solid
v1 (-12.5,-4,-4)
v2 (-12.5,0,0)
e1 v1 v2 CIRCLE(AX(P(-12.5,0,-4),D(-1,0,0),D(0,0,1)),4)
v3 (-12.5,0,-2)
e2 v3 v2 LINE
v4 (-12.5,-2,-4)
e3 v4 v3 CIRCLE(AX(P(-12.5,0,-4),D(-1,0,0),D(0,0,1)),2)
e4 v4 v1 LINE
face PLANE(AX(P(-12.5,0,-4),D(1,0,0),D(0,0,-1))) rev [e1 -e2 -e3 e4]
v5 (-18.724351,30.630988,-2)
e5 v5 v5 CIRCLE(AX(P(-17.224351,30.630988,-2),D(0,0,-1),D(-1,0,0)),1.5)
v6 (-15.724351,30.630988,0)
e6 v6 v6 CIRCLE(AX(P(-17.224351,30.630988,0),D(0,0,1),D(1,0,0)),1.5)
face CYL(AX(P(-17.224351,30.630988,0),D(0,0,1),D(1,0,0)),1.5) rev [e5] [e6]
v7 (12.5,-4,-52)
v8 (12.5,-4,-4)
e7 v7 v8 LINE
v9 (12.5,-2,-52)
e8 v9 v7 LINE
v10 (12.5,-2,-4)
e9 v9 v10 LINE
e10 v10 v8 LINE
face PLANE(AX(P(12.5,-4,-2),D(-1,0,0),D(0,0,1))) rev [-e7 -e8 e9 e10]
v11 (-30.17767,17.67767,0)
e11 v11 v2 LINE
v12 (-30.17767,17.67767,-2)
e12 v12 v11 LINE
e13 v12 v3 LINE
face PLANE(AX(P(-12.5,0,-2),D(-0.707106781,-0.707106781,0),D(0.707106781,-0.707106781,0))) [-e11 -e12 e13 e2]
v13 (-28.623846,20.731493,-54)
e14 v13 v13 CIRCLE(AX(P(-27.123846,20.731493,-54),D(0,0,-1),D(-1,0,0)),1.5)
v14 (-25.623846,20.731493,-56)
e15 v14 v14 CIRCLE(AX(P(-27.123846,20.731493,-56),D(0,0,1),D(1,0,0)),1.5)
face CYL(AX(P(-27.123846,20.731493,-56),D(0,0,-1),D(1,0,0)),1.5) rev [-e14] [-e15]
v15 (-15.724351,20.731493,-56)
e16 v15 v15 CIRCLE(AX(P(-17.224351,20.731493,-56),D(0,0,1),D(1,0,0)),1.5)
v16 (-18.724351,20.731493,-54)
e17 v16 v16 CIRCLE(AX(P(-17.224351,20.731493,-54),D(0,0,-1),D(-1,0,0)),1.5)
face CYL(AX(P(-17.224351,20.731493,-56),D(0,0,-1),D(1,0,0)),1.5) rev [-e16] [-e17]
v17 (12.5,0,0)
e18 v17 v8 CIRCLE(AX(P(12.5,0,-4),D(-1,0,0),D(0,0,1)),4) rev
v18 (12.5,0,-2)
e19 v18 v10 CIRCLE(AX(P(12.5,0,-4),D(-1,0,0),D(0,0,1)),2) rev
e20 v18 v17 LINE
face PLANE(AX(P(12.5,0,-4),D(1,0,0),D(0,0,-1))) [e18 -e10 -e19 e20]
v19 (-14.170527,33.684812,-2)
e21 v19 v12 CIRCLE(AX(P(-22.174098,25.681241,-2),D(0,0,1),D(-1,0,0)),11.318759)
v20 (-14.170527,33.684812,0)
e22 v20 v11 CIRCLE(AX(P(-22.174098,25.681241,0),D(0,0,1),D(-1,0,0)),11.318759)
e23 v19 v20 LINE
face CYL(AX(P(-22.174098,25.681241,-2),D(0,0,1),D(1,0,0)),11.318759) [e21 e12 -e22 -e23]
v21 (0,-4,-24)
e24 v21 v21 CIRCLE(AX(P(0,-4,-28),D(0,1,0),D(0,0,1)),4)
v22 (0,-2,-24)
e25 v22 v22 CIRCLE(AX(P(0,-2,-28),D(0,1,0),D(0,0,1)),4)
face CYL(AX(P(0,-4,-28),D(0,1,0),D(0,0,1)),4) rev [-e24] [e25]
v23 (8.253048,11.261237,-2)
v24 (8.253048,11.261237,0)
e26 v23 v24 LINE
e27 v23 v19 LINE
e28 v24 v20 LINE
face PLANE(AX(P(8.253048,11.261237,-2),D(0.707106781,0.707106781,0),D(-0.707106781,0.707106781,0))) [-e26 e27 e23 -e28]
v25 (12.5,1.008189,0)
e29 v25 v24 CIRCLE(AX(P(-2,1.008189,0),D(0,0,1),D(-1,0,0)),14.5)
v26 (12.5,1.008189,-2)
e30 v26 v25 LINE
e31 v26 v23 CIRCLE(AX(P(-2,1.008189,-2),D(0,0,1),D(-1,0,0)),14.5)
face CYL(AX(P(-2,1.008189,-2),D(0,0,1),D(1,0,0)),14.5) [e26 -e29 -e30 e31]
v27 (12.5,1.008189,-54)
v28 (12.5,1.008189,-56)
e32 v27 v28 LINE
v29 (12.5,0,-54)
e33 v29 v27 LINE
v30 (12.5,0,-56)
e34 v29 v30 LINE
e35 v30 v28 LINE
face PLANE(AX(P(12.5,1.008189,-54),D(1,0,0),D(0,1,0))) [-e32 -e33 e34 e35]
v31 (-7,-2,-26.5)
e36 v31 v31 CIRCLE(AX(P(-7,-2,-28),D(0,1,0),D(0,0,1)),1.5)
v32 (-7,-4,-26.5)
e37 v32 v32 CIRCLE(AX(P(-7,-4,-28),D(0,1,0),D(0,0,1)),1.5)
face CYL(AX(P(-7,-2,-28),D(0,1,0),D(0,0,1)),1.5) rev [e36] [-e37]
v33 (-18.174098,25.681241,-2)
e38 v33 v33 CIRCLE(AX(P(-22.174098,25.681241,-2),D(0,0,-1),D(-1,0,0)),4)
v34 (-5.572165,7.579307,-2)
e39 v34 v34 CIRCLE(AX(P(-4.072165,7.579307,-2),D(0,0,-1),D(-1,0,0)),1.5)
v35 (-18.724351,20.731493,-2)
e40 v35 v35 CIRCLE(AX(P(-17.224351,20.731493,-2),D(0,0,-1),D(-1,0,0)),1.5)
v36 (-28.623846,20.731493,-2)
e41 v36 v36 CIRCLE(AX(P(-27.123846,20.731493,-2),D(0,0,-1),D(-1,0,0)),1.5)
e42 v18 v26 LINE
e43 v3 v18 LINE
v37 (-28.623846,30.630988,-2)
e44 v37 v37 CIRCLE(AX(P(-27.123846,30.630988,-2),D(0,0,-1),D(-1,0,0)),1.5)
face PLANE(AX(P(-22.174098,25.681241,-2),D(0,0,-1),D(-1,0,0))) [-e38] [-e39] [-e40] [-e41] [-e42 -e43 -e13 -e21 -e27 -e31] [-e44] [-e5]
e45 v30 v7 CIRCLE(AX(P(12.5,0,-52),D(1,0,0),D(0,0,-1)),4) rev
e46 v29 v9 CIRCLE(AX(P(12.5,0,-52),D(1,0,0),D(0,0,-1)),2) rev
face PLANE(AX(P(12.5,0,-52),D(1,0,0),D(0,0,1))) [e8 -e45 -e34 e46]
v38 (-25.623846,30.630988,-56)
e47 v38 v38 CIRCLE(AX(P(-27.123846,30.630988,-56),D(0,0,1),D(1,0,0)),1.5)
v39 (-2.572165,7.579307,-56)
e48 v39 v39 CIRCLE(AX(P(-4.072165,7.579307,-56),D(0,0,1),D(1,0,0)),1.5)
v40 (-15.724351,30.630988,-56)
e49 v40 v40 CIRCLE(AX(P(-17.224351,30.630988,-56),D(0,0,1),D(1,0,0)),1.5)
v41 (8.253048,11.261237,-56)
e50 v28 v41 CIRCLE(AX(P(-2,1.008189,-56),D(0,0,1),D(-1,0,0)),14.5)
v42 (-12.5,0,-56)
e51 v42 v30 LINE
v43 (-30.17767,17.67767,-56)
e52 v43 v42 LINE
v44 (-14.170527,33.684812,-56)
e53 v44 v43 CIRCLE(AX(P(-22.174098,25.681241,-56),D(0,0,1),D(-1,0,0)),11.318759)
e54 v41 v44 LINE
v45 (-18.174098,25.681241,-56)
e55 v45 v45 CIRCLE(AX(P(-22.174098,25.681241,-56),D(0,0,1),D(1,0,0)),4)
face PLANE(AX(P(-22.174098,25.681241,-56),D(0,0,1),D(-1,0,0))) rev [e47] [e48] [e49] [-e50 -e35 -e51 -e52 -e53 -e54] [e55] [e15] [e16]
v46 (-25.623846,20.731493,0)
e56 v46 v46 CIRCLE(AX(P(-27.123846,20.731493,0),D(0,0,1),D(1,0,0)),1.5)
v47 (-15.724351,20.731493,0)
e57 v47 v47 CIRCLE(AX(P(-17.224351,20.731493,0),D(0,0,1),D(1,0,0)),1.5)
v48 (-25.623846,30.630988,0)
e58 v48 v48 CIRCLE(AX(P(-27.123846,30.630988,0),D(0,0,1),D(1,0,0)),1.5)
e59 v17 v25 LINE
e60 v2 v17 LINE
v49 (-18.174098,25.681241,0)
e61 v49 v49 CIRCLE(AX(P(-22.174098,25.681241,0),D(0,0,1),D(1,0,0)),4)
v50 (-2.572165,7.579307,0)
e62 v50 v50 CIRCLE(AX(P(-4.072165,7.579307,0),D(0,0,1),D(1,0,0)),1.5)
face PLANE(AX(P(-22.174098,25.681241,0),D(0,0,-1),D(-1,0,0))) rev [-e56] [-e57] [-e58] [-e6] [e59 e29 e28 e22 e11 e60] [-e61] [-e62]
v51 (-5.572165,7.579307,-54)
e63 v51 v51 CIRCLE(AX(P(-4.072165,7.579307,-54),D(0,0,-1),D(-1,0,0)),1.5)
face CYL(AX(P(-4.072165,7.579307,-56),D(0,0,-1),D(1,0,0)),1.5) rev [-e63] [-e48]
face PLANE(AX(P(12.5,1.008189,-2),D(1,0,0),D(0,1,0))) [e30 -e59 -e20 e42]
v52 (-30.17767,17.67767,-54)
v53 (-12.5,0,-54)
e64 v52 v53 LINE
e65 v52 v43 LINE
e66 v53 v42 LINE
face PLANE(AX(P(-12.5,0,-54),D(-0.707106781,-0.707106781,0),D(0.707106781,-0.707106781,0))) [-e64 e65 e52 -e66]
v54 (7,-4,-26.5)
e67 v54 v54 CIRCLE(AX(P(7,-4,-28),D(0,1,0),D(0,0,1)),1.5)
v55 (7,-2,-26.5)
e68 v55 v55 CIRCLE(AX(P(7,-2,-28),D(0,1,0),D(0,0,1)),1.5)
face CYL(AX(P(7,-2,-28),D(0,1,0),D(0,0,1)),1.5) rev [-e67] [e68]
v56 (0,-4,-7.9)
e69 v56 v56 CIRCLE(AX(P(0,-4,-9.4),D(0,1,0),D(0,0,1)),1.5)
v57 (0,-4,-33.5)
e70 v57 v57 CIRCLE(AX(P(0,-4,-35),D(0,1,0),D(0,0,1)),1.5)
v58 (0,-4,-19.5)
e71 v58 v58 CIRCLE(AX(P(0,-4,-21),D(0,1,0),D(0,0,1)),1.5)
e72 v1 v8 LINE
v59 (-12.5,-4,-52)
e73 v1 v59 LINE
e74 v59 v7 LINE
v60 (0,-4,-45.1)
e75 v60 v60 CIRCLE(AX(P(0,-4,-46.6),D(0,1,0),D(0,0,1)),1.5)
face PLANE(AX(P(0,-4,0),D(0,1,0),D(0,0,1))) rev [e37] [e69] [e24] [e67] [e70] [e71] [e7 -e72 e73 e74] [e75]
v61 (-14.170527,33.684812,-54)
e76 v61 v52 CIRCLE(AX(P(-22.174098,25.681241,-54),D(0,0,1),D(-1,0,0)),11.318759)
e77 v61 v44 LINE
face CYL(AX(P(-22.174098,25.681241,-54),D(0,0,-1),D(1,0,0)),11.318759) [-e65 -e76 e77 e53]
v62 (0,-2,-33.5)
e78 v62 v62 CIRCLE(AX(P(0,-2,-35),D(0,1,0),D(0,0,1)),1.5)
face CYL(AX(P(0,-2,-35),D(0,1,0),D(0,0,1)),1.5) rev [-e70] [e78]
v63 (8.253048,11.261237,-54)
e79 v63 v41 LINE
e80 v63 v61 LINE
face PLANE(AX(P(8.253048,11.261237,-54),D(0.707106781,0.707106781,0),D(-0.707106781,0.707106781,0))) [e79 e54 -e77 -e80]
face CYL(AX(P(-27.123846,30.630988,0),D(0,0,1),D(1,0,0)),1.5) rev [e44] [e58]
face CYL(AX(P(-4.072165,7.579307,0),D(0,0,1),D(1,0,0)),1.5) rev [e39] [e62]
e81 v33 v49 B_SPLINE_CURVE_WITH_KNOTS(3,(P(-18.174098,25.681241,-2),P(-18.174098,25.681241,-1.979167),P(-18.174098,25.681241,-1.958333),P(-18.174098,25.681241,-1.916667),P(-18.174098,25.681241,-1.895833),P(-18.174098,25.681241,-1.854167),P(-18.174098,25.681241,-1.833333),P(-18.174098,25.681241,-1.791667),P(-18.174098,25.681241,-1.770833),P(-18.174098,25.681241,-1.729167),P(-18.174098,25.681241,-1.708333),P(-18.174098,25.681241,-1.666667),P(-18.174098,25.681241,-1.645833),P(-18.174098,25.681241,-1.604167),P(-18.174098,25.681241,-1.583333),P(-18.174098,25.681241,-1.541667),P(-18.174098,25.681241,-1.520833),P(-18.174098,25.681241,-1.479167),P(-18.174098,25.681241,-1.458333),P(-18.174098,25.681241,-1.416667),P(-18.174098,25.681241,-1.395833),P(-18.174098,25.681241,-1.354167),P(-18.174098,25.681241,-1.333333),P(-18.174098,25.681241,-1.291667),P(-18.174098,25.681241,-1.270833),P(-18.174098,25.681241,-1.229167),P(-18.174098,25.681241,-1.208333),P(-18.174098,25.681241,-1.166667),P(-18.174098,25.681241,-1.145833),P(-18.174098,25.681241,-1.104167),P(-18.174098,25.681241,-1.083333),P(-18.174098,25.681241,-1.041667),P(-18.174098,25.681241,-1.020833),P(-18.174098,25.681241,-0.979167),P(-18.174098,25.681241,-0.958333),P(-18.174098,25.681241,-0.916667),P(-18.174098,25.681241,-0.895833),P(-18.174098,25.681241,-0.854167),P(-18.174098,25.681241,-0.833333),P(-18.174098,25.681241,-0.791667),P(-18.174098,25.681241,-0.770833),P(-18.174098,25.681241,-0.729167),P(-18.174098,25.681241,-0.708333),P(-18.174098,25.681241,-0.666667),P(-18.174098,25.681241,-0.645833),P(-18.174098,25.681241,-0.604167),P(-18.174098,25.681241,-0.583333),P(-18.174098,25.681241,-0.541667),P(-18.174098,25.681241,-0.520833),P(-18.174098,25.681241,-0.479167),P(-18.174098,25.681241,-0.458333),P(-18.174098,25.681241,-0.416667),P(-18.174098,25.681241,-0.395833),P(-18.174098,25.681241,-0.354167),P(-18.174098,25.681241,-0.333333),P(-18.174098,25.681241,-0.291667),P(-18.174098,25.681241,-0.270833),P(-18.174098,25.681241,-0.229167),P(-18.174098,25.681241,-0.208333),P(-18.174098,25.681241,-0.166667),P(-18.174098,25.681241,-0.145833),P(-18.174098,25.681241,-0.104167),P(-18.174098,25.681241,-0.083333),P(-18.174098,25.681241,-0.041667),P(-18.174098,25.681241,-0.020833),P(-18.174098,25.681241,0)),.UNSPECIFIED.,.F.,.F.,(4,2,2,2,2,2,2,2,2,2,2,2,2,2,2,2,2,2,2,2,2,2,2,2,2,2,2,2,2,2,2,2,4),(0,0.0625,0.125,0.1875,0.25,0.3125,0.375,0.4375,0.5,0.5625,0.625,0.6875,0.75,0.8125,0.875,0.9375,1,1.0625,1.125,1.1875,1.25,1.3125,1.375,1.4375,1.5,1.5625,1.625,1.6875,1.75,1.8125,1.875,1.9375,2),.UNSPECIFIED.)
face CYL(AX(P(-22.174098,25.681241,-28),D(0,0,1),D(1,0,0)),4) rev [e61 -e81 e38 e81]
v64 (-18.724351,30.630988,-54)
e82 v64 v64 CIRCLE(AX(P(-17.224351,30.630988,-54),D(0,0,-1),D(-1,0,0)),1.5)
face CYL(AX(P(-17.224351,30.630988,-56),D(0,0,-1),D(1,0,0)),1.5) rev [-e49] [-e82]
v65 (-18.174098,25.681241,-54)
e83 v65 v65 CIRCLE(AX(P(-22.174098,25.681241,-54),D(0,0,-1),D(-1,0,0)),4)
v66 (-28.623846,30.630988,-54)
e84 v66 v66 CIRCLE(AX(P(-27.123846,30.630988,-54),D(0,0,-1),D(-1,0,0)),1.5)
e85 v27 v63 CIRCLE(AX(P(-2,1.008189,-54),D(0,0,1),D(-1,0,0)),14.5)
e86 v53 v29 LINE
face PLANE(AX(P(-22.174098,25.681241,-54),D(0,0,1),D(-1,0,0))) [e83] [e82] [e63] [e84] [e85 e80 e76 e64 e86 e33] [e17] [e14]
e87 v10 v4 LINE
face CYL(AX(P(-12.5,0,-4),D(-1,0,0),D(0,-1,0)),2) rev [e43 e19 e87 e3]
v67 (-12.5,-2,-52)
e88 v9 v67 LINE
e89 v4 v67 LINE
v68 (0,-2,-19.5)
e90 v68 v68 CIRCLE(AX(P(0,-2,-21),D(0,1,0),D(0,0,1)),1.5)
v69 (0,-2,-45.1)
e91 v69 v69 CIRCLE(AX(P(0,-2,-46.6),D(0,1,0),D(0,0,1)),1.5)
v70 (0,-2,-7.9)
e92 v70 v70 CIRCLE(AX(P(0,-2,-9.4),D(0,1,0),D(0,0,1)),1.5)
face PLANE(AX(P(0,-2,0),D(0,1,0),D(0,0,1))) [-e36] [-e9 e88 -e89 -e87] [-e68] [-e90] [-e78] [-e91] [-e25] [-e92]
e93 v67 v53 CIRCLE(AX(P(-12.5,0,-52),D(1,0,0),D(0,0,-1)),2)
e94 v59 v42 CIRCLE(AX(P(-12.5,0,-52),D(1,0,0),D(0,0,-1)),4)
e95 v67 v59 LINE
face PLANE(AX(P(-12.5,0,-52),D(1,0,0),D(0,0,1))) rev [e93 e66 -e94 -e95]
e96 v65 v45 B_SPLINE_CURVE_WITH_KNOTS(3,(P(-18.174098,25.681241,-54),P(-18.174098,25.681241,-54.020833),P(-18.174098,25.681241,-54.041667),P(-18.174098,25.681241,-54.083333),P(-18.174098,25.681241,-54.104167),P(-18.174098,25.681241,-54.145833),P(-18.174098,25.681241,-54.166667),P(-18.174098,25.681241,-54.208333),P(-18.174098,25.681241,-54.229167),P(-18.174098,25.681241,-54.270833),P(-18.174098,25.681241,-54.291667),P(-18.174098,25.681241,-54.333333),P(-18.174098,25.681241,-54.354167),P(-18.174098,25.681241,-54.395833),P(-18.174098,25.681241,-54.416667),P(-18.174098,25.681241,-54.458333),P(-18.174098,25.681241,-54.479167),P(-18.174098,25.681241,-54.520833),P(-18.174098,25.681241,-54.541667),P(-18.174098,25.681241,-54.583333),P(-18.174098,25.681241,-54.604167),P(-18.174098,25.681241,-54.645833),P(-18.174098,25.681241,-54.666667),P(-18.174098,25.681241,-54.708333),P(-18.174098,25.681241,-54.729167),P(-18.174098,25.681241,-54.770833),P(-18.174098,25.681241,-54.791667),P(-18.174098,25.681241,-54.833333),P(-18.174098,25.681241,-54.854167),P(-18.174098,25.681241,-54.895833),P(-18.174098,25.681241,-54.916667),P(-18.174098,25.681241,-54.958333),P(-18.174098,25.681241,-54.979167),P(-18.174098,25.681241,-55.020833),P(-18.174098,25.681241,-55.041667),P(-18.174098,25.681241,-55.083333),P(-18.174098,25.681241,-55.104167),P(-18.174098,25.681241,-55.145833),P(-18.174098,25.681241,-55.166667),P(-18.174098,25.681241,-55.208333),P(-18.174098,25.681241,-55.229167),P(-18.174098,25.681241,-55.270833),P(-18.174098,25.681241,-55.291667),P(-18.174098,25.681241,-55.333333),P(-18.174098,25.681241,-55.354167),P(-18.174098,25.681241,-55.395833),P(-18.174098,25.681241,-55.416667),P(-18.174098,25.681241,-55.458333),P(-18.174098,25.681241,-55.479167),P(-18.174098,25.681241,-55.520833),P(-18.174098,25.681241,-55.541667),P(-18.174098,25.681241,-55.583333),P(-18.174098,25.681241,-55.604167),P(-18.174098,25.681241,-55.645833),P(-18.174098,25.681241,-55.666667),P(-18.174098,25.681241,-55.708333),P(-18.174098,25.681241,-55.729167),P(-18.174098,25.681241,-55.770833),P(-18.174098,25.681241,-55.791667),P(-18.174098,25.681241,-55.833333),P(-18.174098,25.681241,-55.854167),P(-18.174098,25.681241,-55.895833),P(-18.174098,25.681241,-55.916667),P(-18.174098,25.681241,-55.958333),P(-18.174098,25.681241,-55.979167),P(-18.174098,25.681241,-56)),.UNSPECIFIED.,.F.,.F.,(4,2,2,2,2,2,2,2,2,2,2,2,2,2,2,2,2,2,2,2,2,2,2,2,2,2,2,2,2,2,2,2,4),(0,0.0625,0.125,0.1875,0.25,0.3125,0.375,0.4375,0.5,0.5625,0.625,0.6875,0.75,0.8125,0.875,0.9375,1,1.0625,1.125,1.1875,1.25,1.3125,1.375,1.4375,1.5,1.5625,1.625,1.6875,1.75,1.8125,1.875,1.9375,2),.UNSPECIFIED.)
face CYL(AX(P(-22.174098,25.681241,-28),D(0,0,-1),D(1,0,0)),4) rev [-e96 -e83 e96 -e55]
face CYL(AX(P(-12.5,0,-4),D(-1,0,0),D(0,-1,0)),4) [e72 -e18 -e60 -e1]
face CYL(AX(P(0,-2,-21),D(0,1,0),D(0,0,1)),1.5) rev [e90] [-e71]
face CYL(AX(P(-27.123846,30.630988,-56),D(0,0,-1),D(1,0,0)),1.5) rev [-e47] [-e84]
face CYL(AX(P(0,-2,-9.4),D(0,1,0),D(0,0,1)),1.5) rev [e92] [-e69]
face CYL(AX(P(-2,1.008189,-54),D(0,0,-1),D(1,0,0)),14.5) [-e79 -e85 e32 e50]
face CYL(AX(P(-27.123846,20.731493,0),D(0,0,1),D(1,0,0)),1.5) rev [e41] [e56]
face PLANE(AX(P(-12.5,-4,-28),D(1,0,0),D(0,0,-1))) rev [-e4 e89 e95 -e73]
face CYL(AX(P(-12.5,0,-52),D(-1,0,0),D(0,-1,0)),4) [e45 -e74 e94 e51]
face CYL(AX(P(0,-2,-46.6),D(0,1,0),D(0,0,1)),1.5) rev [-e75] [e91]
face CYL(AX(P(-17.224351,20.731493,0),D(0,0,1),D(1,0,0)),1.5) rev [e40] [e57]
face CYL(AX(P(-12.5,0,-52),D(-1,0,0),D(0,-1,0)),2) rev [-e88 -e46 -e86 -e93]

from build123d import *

# Parameters (mm, degrees)
BASE_FLANGE1_DEPTH    = 2
EDGE_FLANGE1_DEPTH    = 25
SKETCH19_R            = 4
CUT_EXTRUDE2_DEPTH    = 58.225619191
M3X0_5_TAPPED_HOLE1_D = 3
SKETCH22_R            = 4
CUT_EXTRUDE3_DEPTH    = 77.018231312
M3X0_5_TAPPED_HOLE2_D = 3


# Sheet-metal steps are written as plain solids
with BuildPart() as part:
    # Sketch8 → Base-Flange1 (new body)
    with BuildSketch(Plane.XY):
        with BuildLine():
            Line((-12.5, 0), (12.5, 0))
            Line((12.5, 0), (12.5, 1.008188695))
            ThreePointArc((12.5, 1.008188695), (11.396253221, 6.557098465), (8.253048327, 11.261237023))
            Line((8.253048327, 11.261237023), (-14.170526855, 33.684812205))
            ThreePointArc((-14.170526855, 33.684812205), (-30.17766953, 33.684812205), (-30.17766953, 17.67766953))
            Line((-30.17766953, 17.67766953), (-12.5, 0))
        make_face()
    extrude(amount=-BASE_FLANGE1_DEPTH)

    # Edge-Flange1 section (across the edge) → Edge-Flange1 (add)
    with BuildSketch(Plane(origin=(12.5, -2, -2), x_dir=(0, 1, 0), z_dir=(-1, 0, 0))):
        with BuildLine():
            Line((-2, 2), (-2, 26))
            Line((-2, 26), (0, 26))
            Line((0, 26), (0, 2))
            ThreePointArc((0, 2), (0.585786438, 0.585786438), (2, 0))
            Line((2, 0), (2, -2))
            ThreePointArc((2, -2), (-0.828427125, -0.828427125), (-2, 2))
        make_face()
    extrude(amount=EDGE_FLANGE1_DEPTH)

    # Sketch19 → Cut-Extrude2 (cut, through all)
    with BuildSketch(Plane.XY):
        with Locations((-22.174098192, 25.681240867)):
            Circle(SKETCH19_R)
    extrude(amount=-CUT_EXTRUDE2_DEPTH, mode=Mode.SUBTRACT)

    # M3x0.5 Tapped Hole1 (through all)
    with Locations(Plane.XY):
        with Locations((-27.123845661, 30.630988335), (-27.123845661, 20.731493399), (-17.224350724, 20.731493399), (-17.224350724, 30.630988335), (-4.072164594, 7.579307269)):
            Hole(M3X0_5_TAPPED_HOLE1_D / 2)

    # Mirror1: part across plane


with BuildPart() as part_1:
    add(part.part)
    add(part.part.mirror(Plane(origin=(12.5, -4, -28), x_dir=(1, 0, 0), z_dir=(0, 0, 1))))

    # Sketch22 → Cut-Extrude3 (cut, through all)
    with BuildSketch(Plane(origin=(0, -2, 0), x_dir=(1, 0, 0), z_dir=(0, 1, 0))):
        with Locations(Location((0, 28, 0), (0, 0, 270))):
            Circle(SKETCH22_R)
    extrude(amount=-CUT_EXTRUDE3_DEPTH, mode=Mode.SUBTRACT)

    # M3x0.5 Tapped Hole2 (through all)
    with Locations(Plane(origin=(0, -2, 0), x_dir=(1, 0, 0), z_dir=(0, 1, 0))):
        with Locations((7, 28), (-7, 28), (0, 35), (0, 21), (0, 9.4), (0, 46.6)):
            Hole(M3X0_5_TAPPED_HOLE2_D / 2)


solid = part_1.part
